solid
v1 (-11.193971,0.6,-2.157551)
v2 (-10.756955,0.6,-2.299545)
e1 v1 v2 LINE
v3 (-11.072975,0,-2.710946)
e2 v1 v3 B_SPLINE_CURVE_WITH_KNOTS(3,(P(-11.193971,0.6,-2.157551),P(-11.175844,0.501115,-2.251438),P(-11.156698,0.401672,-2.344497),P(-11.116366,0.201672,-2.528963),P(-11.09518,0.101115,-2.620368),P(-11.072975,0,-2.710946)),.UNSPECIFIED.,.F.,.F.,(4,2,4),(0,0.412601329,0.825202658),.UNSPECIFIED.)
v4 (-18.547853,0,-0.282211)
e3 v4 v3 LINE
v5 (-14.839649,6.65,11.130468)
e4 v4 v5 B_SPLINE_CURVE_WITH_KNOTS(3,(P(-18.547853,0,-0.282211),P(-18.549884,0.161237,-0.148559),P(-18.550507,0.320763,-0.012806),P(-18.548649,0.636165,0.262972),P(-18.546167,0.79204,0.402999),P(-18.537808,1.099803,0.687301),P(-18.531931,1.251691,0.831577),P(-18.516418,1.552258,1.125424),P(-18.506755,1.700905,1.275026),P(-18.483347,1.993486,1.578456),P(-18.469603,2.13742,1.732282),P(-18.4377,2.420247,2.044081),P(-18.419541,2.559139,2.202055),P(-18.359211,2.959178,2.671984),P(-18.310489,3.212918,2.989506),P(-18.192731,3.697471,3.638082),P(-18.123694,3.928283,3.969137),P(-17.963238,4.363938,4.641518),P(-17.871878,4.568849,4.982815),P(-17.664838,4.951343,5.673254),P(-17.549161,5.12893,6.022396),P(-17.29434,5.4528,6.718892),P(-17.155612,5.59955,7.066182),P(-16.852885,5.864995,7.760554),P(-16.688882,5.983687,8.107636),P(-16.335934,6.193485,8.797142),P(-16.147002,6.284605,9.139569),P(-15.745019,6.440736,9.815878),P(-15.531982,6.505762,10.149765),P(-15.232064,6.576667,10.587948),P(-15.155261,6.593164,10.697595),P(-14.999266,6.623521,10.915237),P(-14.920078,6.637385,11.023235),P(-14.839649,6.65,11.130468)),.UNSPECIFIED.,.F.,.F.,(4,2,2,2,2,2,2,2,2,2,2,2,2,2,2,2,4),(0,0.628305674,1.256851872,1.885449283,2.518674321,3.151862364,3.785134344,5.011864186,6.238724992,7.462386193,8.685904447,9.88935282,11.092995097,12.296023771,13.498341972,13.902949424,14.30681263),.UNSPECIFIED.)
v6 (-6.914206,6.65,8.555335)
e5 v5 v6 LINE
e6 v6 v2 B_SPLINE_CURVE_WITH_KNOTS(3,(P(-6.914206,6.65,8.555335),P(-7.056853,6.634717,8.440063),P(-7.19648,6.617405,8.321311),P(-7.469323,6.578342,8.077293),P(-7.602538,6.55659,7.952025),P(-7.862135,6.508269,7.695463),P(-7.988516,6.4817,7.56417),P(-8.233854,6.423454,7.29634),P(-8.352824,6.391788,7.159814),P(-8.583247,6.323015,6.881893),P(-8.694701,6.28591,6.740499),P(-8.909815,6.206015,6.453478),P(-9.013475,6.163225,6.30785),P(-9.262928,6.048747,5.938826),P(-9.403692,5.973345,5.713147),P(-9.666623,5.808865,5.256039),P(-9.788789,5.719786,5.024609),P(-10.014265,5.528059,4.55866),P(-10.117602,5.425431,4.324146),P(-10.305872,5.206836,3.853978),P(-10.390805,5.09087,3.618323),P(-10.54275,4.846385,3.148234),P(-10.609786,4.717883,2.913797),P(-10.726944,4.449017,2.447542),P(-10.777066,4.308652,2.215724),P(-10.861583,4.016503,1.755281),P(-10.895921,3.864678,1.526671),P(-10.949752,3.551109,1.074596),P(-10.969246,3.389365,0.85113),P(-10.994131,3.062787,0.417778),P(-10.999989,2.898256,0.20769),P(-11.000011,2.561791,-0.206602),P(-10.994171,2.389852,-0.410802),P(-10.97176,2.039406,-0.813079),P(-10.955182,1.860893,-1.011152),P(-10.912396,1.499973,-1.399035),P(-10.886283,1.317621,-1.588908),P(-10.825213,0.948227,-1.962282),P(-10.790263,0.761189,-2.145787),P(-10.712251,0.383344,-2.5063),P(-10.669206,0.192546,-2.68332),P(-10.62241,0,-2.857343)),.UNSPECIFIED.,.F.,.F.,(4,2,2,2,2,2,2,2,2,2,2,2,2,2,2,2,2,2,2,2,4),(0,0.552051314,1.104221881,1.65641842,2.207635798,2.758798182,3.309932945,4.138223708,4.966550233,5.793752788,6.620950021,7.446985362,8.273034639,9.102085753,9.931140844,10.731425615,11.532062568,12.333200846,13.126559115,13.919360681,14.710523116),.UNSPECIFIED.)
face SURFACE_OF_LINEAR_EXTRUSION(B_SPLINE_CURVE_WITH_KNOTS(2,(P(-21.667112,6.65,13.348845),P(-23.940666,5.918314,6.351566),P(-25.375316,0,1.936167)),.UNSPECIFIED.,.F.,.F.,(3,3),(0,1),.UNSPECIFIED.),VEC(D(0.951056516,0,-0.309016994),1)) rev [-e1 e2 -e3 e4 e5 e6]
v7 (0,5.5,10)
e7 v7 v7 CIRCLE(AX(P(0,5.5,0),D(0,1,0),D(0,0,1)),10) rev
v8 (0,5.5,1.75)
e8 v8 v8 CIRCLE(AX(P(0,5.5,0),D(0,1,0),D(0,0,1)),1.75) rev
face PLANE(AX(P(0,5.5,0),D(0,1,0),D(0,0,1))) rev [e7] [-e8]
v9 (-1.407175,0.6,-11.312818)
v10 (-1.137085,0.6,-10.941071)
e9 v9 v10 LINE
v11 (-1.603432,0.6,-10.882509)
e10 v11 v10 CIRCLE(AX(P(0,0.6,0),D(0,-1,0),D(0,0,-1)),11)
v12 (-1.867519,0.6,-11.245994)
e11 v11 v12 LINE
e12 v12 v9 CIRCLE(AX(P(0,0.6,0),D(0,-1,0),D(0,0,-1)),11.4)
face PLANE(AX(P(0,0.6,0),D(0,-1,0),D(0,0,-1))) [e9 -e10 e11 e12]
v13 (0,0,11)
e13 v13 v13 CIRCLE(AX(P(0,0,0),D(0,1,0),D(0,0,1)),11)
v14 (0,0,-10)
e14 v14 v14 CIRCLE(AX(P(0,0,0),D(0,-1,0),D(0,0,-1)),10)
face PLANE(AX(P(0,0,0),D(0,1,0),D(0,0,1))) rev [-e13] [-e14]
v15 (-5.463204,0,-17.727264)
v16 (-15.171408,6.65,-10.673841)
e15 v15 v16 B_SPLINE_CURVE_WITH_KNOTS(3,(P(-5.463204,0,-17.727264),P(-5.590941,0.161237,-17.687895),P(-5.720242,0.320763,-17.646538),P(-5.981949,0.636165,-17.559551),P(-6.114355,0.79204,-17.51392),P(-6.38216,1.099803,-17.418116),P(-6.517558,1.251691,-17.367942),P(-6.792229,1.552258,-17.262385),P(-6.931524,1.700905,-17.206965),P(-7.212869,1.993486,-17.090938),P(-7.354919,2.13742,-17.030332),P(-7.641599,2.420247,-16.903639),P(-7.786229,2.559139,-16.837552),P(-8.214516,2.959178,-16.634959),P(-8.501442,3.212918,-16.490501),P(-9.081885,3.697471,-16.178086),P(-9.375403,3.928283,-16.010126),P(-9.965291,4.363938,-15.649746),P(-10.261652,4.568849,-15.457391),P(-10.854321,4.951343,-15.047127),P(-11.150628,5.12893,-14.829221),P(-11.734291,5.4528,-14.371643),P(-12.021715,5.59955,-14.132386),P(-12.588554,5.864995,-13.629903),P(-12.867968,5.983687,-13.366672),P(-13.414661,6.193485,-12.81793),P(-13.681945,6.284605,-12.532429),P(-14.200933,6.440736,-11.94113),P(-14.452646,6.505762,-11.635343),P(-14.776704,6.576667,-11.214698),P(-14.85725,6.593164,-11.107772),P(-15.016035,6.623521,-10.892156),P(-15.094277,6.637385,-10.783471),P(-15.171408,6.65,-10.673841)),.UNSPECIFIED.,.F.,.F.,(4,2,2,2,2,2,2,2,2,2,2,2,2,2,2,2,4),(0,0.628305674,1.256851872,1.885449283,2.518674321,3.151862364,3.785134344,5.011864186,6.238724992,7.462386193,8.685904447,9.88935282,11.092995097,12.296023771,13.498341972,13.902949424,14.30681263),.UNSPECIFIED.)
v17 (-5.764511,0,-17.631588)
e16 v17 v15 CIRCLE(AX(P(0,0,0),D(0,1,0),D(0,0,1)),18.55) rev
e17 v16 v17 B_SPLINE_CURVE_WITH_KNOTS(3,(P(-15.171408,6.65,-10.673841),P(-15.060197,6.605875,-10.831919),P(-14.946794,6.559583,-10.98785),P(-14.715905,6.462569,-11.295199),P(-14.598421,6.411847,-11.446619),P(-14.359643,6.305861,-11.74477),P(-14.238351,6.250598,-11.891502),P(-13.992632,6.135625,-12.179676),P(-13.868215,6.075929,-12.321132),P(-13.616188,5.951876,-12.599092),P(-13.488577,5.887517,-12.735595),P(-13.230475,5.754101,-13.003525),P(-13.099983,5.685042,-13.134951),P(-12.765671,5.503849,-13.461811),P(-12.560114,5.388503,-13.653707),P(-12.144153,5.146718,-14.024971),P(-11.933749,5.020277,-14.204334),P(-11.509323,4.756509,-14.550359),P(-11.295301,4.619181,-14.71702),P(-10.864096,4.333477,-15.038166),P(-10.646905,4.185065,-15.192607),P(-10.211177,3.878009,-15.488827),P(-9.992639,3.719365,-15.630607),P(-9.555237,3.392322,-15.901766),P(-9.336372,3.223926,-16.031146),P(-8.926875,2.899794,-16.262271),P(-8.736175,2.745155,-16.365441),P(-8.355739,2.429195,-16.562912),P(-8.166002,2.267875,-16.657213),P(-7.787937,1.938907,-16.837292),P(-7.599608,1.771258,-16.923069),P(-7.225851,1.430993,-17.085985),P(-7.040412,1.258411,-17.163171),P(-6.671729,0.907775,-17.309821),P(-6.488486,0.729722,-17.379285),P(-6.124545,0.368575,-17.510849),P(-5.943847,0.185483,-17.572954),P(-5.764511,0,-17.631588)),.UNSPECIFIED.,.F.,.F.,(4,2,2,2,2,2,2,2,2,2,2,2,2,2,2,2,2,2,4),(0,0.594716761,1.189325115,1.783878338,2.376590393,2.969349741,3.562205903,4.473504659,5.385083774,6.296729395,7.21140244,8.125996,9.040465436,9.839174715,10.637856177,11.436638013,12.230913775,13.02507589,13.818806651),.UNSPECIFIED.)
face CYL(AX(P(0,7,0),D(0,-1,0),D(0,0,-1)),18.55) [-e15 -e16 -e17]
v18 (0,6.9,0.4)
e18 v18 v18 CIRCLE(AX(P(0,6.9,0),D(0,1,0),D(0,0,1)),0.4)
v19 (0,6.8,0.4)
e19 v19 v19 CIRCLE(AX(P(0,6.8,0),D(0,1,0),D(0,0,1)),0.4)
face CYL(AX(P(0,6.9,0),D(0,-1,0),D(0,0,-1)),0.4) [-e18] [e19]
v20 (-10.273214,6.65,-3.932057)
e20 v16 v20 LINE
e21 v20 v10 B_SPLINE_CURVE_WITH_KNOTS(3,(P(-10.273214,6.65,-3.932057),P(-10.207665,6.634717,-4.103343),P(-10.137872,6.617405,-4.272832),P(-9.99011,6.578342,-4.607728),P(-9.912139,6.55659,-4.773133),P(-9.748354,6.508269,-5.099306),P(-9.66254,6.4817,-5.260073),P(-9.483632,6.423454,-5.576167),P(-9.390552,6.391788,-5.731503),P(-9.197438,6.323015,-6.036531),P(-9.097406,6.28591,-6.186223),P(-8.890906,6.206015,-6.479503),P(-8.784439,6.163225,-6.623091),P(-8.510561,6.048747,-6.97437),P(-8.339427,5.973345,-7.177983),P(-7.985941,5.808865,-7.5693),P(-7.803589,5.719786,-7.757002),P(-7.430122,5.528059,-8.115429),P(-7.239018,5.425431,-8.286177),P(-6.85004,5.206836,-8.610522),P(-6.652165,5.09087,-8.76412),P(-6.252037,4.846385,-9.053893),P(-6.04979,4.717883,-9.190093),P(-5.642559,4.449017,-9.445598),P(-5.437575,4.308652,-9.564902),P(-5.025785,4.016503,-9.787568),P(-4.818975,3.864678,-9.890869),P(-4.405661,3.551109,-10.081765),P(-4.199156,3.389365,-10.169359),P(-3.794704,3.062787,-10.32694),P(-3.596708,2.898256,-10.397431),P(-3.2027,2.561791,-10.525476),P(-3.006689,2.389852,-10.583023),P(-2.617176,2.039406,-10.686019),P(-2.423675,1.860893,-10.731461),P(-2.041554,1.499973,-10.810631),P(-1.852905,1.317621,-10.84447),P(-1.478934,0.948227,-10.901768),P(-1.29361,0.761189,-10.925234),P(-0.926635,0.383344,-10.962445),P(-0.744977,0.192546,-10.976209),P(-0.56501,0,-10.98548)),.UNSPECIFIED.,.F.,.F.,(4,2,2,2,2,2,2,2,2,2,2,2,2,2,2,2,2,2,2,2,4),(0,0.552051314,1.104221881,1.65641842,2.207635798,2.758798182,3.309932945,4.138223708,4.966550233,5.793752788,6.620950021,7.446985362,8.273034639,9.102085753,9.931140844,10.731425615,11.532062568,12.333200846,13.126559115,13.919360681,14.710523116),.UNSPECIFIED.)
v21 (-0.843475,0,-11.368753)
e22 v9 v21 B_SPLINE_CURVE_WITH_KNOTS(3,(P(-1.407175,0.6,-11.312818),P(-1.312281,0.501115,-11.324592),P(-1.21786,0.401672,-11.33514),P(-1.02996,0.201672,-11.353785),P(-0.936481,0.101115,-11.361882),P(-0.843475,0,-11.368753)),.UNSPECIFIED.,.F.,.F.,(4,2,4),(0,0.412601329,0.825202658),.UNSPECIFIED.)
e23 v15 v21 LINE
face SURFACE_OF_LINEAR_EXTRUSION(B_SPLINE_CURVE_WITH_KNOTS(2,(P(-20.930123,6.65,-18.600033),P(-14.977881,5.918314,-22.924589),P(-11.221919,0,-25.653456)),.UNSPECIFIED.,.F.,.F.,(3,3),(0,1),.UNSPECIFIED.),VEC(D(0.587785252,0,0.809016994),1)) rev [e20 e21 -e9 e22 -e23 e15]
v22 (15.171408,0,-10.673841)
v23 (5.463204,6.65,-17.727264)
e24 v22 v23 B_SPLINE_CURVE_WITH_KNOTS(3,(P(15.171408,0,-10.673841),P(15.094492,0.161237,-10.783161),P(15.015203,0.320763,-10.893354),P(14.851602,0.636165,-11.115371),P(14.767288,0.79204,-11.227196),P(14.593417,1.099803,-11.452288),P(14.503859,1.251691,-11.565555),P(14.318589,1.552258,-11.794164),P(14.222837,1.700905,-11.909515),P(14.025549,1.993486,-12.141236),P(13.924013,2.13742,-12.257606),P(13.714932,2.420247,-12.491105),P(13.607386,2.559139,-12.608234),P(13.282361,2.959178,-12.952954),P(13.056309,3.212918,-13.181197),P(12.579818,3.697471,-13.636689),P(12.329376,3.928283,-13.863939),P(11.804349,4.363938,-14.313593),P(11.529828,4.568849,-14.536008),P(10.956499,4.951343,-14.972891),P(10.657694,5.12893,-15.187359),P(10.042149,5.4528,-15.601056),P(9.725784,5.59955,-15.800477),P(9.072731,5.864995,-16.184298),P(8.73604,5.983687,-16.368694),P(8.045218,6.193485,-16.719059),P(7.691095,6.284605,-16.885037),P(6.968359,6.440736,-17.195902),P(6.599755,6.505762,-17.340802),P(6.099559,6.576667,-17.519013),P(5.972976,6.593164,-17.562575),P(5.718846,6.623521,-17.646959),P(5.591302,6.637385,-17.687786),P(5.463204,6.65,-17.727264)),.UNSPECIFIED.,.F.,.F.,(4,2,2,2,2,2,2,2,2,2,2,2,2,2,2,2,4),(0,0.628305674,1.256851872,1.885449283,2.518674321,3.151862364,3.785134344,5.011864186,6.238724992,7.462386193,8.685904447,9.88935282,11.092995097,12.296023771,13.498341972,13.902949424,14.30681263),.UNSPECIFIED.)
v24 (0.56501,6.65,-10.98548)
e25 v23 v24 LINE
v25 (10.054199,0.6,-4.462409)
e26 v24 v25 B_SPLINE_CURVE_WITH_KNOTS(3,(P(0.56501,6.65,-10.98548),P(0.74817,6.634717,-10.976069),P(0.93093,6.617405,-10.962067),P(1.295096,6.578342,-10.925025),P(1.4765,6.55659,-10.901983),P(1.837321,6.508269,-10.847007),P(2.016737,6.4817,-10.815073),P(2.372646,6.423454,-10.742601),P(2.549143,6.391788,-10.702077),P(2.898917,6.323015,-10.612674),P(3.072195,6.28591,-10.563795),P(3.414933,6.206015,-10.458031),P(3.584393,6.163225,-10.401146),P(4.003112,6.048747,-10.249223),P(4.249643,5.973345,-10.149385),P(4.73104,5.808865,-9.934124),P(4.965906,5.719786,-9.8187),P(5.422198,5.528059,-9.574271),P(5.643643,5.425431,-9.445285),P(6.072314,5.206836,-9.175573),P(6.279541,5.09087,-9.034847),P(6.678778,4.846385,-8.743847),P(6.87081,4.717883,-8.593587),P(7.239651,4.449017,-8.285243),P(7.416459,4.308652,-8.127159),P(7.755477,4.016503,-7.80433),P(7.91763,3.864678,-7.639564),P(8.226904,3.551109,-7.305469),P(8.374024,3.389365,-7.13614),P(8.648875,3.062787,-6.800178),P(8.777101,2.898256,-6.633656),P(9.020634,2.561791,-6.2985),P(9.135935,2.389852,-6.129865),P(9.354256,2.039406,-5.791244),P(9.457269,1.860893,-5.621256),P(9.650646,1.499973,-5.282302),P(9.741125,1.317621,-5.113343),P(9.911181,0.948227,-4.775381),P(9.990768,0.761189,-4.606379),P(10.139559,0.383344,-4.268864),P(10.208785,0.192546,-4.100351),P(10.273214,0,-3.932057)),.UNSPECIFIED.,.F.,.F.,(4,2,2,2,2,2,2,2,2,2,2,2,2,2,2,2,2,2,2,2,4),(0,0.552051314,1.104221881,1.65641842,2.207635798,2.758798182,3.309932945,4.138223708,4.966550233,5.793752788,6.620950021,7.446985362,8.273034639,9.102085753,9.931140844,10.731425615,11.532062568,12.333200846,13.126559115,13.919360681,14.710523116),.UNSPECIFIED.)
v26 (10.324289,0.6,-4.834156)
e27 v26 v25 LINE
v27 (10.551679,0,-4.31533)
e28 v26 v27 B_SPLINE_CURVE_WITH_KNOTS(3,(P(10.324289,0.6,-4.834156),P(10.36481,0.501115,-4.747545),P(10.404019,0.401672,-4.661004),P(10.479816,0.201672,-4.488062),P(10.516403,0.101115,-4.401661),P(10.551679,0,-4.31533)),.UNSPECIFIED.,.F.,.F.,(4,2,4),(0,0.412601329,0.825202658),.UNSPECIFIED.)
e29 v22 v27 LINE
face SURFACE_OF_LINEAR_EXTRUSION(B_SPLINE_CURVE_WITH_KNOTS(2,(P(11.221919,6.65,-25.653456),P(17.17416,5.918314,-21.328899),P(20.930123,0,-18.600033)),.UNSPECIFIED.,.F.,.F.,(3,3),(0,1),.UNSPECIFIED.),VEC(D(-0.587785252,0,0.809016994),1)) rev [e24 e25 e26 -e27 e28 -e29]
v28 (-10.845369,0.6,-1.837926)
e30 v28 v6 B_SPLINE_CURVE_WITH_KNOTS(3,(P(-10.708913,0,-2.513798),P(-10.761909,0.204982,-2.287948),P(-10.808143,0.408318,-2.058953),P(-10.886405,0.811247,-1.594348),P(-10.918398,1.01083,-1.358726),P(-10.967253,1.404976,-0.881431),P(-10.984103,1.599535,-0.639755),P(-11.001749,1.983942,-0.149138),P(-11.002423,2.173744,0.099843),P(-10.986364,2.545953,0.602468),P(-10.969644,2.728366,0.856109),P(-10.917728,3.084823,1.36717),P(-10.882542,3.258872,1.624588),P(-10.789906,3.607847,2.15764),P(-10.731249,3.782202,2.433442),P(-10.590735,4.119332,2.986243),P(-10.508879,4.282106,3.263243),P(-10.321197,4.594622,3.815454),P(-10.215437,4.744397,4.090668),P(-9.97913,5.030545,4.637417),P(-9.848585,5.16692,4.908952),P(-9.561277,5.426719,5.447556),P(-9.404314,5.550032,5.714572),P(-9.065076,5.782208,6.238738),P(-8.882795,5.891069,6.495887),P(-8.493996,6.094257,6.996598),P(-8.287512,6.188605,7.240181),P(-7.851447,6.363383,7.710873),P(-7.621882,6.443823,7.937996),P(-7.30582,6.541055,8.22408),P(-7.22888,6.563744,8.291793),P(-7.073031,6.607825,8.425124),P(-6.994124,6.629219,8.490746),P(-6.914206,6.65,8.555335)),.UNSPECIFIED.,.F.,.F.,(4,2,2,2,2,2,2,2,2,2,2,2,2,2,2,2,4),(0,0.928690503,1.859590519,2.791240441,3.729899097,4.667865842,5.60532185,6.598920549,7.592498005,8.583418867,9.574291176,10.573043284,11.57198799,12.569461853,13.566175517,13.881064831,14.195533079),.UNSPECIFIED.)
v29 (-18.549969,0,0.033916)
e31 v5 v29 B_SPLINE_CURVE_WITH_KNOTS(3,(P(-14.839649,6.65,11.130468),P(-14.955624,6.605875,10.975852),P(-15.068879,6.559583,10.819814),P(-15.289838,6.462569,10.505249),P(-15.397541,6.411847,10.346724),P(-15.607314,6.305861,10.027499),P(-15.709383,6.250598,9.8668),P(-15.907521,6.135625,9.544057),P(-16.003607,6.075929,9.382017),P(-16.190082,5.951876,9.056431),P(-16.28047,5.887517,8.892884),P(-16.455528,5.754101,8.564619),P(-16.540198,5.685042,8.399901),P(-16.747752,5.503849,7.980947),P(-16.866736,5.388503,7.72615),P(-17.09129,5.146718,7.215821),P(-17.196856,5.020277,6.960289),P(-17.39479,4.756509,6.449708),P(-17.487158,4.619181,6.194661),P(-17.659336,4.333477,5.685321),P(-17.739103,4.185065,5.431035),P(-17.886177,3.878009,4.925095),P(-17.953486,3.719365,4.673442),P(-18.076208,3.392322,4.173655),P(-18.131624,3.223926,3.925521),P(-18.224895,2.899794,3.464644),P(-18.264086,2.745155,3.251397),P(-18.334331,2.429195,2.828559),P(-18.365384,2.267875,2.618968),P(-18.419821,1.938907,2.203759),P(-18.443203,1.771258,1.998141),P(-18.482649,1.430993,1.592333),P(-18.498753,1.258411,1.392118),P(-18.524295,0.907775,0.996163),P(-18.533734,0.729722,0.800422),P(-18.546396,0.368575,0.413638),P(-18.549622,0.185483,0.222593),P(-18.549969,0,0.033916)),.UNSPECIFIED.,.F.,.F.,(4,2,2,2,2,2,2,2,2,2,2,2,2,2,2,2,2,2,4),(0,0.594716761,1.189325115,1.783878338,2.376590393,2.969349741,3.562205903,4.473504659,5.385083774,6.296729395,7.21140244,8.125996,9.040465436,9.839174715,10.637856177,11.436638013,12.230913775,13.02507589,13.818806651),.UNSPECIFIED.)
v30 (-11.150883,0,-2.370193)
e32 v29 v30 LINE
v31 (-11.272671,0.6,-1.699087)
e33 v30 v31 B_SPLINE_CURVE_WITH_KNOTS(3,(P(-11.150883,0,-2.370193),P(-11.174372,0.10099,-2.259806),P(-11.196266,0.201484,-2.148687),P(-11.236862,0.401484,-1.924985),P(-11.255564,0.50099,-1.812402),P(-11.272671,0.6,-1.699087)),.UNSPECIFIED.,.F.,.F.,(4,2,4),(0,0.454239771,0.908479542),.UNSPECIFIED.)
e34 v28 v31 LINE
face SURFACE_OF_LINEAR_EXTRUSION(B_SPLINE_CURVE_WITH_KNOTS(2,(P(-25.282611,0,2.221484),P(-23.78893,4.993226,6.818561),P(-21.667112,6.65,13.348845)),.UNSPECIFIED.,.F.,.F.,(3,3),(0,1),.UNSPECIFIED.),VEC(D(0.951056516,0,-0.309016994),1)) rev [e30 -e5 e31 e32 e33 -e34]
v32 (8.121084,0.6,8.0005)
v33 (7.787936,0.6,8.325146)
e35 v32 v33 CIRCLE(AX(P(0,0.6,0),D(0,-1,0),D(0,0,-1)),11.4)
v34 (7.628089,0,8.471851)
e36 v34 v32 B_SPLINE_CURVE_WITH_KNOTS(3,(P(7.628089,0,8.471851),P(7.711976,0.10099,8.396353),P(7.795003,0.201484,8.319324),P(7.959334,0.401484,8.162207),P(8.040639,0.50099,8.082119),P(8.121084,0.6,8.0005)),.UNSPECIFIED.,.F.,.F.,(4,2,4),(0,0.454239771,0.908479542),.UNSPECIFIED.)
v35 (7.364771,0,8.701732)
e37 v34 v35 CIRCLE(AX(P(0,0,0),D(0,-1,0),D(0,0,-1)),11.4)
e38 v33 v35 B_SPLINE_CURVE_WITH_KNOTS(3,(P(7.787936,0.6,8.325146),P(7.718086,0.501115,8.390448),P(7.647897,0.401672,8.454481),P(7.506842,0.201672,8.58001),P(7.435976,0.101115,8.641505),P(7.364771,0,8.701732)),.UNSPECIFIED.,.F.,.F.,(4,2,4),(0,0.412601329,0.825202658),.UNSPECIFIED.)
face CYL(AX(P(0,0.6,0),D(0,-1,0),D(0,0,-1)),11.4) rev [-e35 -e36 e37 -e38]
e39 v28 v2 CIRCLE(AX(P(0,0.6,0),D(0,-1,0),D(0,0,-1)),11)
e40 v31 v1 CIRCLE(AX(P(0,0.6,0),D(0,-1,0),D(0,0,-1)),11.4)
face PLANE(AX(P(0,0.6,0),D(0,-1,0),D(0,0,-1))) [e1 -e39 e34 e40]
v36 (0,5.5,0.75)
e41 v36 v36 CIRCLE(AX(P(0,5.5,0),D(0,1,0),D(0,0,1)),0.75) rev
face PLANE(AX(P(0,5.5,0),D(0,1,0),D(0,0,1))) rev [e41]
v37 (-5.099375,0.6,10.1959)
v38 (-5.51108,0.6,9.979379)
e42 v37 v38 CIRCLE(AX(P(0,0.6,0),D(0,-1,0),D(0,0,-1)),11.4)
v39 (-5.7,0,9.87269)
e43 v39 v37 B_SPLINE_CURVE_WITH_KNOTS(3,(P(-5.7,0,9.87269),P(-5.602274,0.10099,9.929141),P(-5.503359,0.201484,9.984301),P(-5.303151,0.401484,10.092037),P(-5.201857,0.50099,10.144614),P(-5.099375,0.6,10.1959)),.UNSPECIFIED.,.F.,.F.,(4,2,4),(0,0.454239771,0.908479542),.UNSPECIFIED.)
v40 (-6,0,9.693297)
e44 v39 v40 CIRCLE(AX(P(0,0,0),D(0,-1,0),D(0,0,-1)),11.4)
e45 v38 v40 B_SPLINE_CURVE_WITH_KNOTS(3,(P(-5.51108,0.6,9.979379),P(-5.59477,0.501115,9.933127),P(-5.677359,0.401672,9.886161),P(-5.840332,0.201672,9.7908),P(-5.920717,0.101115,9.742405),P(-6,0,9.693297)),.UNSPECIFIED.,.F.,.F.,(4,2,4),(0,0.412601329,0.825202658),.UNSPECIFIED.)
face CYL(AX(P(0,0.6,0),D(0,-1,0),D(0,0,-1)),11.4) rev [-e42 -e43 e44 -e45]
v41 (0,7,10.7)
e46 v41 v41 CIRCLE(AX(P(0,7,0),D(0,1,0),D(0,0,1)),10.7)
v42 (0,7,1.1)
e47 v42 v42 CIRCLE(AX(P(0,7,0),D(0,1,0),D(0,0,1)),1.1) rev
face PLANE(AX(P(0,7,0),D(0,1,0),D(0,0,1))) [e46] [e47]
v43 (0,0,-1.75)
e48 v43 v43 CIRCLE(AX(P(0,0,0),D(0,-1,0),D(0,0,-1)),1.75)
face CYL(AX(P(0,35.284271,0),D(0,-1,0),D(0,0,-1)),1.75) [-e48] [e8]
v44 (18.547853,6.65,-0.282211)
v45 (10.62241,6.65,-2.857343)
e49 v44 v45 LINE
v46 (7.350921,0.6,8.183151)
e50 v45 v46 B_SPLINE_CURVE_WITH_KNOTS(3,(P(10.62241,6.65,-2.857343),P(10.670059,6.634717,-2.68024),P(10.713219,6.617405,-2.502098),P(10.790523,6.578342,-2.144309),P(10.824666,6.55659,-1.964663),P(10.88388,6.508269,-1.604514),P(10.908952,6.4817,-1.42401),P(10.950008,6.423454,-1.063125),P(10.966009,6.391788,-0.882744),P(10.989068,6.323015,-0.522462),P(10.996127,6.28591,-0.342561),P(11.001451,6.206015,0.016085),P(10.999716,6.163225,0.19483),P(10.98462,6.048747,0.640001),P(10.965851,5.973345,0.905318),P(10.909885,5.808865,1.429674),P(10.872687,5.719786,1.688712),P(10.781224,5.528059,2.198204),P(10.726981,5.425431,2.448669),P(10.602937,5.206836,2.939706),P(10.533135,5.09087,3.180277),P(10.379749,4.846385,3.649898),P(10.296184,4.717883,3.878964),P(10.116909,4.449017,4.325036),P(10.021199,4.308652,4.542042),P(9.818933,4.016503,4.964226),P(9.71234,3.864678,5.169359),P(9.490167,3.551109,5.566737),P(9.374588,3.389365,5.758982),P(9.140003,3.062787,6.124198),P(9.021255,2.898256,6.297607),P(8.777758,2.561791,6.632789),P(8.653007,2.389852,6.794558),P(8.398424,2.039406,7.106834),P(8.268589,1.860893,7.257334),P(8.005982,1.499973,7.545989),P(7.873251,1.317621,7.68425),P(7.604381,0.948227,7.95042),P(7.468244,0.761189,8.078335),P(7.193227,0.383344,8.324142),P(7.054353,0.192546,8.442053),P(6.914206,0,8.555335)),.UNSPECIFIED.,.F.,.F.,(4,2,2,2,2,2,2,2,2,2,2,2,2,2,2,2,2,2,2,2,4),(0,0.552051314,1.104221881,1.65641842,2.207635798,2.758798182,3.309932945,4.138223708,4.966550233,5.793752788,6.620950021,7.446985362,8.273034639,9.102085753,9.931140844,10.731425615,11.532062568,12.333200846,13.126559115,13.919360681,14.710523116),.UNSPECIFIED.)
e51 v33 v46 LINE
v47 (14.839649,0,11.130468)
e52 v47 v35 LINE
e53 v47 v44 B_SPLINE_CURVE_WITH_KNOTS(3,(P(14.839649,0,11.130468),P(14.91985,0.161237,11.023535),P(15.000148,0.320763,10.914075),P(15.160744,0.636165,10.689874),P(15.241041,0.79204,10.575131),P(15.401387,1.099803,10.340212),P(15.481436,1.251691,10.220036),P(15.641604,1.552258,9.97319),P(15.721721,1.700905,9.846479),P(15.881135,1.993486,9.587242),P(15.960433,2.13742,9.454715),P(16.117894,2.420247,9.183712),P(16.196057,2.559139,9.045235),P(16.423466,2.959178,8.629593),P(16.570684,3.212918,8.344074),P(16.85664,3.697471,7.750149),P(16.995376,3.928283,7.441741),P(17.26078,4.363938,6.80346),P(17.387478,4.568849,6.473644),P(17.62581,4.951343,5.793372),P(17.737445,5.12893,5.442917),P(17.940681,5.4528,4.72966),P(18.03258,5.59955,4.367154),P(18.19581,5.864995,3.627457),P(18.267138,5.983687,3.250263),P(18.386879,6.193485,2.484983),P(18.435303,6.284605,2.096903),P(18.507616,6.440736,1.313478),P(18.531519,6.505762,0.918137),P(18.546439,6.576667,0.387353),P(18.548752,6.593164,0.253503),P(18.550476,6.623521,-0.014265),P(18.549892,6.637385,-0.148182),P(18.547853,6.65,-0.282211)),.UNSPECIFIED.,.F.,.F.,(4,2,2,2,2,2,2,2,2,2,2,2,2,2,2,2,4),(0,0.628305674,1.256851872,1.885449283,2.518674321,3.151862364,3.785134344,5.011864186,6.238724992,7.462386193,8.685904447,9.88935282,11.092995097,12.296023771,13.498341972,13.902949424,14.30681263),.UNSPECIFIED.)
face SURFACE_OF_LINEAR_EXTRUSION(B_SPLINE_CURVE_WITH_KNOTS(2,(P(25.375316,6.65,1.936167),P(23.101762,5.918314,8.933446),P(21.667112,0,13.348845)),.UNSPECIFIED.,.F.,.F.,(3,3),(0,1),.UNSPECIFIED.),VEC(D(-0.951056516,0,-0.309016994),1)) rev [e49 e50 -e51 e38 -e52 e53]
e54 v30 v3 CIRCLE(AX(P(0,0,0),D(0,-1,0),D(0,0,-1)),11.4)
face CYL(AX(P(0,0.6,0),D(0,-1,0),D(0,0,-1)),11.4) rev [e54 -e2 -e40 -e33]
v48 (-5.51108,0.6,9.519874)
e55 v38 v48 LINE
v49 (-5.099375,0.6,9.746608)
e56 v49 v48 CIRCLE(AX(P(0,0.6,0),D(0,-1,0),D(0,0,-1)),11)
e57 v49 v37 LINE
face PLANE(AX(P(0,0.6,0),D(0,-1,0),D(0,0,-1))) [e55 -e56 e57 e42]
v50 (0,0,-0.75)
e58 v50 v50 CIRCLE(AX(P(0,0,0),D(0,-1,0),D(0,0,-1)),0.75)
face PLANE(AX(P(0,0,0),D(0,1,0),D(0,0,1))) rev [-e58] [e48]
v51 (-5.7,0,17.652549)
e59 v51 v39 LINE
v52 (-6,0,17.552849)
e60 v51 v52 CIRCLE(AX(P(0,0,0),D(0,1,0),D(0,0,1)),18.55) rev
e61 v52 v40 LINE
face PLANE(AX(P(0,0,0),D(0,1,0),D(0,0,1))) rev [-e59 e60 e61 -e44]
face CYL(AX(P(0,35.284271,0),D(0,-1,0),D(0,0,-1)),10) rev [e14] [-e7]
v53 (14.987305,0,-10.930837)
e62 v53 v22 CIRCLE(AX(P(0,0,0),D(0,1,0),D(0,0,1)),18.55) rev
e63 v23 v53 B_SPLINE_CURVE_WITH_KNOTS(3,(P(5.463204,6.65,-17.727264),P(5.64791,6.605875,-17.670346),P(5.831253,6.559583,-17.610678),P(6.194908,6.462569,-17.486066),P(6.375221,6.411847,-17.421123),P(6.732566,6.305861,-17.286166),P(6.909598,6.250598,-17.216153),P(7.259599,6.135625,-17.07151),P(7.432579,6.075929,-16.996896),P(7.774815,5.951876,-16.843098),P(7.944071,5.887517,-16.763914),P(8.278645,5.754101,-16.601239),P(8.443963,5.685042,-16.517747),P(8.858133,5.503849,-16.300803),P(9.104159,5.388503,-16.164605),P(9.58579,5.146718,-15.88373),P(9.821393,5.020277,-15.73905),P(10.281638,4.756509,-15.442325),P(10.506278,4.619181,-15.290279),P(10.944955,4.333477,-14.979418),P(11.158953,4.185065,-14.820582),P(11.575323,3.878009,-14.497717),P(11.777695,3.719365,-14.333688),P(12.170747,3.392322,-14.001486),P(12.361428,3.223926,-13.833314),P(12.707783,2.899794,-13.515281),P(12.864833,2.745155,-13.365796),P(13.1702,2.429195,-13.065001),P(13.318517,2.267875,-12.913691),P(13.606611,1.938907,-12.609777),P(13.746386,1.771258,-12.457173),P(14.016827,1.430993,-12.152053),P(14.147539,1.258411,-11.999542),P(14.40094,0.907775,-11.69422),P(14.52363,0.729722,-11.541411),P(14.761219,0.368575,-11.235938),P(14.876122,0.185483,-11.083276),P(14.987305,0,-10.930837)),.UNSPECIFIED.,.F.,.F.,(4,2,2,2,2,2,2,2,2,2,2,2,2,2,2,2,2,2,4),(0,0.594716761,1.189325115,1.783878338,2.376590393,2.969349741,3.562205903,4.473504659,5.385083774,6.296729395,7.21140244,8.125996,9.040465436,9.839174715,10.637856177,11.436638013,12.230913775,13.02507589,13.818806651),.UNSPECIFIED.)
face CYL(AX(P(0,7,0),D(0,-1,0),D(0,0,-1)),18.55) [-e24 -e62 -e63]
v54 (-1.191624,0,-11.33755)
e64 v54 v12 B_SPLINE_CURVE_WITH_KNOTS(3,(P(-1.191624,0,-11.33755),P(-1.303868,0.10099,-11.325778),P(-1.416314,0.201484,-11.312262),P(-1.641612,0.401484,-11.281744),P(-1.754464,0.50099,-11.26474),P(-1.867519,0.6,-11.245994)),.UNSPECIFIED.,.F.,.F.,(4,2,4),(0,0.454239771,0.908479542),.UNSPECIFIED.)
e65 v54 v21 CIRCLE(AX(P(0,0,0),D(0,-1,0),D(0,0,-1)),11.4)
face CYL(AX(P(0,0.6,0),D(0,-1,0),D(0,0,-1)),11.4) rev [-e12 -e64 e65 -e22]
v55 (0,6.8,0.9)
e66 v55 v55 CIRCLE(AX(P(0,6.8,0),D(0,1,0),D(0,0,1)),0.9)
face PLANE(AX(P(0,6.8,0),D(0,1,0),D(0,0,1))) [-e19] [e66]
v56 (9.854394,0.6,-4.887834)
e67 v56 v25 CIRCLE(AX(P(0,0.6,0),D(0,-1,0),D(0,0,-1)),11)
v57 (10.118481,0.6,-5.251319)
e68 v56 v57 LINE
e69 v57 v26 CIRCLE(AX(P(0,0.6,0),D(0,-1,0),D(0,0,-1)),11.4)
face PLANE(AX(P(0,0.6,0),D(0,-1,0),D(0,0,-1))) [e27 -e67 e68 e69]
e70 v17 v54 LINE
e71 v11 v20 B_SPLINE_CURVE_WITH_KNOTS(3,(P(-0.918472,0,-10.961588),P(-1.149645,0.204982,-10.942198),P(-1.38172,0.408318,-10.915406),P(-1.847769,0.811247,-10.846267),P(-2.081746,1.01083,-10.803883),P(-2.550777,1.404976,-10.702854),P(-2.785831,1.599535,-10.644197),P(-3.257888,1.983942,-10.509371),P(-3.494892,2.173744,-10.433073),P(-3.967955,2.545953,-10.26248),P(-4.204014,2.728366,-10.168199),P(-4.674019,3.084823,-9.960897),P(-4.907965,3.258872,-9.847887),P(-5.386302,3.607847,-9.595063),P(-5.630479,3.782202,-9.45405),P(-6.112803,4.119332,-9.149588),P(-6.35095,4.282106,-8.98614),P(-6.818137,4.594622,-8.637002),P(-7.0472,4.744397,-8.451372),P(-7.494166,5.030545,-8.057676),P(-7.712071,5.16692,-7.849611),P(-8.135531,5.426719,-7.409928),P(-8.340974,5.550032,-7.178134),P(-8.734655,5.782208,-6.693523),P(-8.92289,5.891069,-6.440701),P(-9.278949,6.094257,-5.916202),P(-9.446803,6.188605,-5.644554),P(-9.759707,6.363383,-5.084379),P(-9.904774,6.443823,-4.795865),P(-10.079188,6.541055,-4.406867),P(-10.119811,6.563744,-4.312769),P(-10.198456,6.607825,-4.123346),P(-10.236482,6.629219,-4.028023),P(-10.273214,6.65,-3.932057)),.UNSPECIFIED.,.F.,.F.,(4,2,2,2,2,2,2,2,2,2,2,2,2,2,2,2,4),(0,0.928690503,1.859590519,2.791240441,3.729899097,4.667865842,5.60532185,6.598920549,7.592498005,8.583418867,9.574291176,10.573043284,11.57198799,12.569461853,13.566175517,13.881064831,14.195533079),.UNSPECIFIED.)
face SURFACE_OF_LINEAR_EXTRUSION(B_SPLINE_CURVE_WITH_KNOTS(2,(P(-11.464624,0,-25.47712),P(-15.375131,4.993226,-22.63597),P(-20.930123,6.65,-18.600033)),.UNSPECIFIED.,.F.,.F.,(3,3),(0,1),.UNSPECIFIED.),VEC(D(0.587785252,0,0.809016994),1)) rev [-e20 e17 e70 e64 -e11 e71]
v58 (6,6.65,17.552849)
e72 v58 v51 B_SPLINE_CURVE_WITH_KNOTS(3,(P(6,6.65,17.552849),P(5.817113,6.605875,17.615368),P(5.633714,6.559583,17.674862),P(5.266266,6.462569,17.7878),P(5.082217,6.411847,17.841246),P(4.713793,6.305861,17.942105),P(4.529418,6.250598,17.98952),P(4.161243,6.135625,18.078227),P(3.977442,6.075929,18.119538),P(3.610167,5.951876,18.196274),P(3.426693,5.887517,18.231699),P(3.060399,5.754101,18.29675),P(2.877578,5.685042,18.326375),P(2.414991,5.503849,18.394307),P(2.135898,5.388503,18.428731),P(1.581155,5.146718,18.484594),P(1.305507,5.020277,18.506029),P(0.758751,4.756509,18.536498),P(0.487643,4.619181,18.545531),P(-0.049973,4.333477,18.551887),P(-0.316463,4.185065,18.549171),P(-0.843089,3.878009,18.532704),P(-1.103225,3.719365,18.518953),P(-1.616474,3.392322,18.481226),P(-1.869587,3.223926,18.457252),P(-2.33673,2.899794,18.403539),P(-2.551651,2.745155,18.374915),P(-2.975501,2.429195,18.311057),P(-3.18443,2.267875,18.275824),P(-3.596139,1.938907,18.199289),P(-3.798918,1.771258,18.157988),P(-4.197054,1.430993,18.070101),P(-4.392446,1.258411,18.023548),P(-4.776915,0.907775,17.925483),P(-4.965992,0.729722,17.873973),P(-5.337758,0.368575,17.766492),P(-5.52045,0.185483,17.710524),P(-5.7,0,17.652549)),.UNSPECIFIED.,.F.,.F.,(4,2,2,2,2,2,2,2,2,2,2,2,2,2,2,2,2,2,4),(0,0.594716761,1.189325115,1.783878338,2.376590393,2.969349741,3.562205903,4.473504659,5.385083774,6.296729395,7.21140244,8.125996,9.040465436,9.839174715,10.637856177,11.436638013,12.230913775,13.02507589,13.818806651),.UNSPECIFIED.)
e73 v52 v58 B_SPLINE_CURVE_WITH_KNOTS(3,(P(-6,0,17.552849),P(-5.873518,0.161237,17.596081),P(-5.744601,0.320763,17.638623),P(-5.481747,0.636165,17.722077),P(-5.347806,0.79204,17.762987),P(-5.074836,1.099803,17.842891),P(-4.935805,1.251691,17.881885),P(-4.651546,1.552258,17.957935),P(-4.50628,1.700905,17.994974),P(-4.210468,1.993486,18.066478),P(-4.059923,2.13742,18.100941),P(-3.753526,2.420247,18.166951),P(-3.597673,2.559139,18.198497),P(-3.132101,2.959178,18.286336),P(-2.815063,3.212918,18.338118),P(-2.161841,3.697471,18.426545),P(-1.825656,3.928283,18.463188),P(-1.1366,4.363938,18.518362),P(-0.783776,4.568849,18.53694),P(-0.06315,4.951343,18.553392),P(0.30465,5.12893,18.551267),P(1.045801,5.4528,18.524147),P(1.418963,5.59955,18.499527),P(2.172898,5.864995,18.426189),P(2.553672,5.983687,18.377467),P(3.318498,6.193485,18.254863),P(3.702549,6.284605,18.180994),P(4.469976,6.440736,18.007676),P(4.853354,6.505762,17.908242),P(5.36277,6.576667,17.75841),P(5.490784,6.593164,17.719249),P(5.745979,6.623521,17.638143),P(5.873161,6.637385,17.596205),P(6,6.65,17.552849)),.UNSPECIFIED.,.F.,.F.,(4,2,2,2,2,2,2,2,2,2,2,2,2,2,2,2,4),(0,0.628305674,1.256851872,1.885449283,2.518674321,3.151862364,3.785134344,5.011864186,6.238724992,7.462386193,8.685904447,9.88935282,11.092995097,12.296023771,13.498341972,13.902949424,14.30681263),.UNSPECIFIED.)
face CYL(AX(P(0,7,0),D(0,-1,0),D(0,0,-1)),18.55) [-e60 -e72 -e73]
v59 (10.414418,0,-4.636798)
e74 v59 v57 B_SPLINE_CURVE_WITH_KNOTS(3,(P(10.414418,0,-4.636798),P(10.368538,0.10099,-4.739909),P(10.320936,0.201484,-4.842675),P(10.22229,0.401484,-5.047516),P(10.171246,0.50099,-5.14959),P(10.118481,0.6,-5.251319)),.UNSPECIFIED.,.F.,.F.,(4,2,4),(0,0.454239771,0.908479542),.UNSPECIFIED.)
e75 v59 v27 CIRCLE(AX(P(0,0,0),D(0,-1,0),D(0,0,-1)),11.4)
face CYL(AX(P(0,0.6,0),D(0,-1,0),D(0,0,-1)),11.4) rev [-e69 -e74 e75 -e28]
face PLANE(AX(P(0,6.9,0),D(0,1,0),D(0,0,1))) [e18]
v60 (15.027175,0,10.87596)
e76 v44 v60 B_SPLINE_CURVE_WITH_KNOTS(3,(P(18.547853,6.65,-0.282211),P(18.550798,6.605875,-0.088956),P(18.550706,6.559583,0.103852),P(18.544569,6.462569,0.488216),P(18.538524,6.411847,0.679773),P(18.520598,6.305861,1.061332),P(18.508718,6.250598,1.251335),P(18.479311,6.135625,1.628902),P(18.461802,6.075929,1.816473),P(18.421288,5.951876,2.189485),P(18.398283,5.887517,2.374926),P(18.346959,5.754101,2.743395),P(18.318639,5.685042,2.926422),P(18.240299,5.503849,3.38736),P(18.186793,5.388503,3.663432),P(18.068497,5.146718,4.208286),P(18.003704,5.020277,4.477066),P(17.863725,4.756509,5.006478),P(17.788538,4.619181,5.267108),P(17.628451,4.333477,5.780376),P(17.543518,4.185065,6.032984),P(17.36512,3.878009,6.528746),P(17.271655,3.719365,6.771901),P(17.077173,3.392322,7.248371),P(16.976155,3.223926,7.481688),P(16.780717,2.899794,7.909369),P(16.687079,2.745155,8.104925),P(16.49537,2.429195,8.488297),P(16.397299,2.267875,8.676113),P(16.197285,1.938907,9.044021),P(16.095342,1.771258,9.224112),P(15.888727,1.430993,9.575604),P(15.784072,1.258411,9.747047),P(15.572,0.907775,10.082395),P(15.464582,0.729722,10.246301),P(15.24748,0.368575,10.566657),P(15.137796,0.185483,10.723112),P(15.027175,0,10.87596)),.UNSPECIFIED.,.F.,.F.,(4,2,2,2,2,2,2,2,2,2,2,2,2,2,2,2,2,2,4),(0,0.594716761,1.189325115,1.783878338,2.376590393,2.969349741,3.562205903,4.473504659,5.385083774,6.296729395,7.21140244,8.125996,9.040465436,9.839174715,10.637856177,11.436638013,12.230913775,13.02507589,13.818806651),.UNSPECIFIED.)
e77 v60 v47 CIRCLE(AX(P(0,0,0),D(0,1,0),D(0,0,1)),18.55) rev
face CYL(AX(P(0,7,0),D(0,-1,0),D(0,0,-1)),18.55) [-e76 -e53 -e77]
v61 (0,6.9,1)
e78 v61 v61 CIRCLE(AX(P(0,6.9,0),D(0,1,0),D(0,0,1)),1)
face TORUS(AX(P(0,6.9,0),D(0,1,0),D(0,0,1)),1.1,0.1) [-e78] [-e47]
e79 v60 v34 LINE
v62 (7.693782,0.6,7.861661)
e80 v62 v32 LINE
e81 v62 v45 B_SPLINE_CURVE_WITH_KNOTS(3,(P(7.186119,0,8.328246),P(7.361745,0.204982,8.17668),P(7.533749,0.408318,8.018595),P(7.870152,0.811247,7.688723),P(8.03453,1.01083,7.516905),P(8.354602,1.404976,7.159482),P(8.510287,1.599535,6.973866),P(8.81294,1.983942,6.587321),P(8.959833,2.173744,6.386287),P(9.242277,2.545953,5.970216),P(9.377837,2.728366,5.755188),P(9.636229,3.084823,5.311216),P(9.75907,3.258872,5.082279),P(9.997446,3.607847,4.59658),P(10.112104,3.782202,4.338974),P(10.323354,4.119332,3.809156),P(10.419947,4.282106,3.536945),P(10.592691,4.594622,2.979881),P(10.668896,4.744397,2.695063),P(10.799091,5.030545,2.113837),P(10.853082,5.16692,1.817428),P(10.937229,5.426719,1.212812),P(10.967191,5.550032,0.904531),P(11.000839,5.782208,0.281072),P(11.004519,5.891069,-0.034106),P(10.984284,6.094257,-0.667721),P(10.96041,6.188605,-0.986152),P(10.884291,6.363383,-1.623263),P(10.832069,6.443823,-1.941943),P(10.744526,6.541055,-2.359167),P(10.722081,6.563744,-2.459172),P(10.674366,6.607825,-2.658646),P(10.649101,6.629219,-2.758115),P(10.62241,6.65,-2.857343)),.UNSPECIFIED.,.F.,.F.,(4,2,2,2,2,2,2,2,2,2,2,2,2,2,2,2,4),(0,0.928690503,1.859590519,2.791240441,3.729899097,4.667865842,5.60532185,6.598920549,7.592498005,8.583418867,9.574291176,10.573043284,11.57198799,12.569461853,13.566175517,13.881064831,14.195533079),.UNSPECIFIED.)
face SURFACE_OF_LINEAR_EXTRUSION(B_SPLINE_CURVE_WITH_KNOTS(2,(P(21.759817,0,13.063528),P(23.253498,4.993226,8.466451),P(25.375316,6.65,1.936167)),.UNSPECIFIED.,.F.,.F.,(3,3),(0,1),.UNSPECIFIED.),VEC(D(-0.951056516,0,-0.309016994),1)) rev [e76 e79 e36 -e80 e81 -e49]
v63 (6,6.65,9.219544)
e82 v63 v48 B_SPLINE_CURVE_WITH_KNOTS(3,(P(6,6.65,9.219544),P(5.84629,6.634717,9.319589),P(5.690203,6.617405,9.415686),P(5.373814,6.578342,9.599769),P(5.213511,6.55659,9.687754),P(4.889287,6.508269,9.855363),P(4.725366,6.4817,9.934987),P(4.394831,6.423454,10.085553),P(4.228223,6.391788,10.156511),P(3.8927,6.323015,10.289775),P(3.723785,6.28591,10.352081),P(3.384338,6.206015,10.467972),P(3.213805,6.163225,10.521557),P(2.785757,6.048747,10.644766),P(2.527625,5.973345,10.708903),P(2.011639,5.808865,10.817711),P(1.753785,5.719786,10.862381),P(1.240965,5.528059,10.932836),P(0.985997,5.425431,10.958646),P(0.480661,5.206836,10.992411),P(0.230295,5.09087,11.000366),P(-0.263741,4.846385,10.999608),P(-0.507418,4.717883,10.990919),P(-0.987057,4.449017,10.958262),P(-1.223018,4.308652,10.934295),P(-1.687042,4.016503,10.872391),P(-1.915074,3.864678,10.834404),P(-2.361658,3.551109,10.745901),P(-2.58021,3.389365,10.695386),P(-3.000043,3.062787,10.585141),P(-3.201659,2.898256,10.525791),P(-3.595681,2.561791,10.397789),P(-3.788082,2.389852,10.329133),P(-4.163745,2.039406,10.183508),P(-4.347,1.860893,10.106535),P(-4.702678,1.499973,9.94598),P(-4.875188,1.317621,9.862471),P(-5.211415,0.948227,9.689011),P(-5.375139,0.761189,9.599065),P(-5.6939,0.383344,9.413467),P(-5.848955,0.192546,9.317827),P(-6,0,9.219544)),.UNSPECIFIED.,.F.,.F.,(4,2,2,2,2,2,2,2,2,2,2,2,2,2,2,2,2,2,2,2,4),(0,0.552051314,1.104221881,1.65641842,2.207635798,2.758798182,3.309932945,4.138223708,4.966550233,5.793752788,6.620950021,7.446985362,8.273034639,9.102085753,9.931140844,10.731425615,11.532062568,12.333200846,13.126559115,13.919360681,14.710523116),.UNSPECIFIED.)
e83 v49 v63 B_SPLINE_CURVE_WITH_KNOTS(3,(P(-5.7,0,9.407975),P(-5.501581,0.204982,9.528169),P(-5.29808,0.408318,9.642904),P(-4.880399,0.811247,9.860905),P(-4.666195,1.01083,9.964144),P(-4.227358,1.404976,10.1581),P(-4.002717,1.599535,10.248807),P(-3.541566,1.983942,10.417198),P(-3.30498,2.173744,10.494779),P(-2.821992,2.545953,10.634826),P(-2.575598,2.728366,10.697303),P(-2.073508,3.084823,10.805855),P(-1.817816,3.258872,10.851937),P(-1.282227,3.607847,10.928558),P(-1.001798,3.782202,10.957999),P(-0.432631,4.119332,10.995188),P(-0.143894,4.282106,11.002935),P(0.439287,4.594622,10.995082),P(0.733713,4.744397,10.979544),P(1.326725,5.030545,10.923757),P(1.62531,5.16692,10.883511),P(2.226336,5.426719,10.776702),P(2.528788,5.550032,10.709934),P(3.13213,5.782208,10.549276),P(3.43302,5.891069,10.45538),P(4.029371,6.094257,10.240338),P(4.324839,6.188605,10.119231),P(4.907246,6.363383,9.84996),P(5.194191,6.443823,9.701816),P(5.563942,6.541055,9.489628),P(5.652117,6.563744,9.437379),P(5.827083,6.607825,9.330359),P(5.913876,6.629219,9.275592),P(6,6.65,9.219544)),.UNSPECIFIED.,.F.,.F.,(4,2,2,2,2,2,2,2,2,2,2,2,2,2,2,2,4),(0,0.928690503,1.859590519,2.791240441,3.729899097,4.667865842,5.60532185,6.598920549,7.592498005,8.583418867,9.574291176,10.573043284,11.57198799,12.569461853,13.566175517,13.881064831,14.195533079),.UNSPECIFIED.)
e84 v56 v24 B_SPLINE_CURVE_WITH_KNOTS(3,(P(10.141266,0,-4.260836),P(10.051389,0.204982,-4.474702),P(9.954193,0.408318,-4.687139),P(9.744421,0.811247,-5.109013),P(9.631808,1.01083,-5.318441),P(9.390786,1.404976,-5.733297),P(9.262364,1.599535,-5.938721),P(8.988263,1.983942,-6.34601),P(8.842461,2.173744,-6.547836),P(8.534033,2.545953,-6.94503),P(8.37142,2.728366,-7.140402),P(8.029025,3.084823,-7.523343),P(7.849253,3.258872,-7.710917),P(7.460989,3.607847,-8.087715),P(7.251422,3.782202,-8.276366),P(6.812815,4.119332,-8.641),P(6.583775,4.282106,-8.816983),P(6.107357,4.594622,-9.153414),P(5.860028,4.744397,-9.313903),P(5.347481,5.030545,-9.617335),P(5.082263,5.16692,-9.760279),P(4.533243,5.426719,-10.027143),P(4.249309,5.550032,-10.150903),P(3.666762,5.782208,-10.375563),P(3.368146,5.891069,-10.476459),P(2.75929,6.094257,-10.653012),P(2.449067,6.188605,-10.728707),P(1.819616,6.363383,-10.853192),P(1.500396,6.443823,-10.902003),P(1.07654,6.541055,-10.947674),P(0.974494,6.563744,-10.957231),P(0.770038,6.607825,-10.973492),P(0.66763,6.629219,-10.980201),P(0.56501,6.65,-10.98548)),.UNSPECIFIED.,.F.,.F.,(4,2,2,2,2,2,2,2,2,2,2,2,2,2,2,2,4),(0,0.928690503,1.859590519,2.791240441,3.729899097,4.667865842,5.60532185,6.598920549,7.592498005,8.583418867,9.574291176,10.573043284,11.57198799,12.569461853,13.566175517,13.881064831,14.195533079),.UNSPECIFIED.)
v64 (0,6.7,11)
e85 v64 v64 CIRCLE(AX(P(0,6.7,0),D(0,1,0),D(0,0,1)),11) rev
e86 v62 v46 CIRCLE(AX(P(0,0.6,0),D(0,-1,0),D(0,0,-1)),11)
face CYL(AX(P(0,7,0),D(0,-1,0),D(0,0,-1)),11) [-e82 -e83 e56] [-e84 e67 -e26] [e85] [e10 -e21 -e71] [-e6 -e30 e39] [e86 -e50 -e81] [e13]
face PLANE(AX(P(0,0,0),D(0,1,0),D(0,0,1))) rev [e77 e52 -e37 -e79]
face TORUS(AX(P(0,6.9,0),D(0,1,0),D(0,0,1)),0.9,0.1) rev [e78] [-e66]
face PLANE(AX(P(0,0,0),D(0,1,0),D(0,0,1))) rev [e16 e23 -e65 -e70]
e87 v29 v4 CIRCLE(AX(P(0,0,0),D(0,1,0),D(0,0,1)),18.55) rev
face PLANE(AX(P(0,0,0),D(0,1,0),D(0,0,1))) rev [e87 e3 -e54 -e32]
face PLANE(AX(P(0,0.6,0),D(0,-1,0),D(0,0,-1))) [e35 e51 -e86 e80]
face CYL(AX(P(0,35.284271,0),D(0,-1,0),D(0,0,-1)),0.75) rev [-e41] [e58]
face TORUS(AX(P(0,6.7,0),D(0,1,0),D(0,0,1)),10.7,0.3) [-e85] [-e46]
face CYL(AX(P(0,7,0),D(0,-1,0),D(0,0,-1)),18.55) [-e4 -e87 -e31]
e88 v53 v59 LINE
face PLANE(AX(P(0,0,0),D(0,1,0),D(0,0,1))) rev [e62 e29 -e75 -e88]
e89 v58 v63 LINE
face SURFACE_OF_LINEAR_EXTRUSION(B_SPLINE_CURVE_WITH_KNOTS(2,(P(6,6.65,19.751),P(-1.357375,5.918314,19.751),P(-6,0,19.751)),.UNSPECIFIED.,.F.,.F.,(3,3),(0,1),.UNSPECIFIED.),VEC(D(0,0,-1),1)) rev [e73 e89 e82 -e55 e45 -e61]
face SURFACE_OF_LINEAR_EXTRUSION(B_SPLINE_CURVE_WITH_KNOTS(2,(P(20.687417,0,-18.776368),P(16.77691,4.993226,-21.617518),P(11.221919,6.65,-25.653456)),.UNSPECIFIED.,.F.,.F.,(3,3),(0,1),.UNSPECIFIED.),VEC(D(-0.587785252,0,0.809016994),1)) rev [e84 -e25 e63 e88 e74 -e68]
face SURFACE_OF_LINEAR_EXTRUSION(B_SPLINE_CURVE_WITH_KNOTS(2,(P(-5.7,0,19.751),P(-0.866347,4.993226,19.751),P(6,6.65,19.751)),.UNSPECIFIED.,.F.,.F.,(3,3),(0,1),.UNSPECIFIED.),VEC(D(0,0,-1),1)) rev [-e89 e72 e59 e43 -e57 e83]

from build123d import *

# Parameters (mm, degrees)
SKETCH1_R                = 11
BOSS_EXTRUDE1_DEPTH      = 7
BOSS_EXTRUDE2_REACH      = 19.059
BOSS_EXTRUDE2_END_RADIUS = 18.55
CIRPATTERN1_COUNT        = 5
SKETCH4_R                = 10
SKETCH4_R_2              = 1.75
SKETCH4_R_3              = 0.75
CUT_EXTRUDE1_DEPTH       = 5.5
FILLET1_R                = 0.3
SKETCH5_R                = 1
CUT_EXTRUDE2_DEPTH       = 0.2
FILLET2_R                = 0.1
SKETCH6_R                = 11.4
SKETCH6_R_2              = 11
CUT_EXTRUDE3_DEPTH       = 0.6
SKETCH7_R                = 0.4
BOSS_EXTRUDE3_DEPTH      = 0.1


with BuildPart() as part:
    # Sketch1 → Boss-Extrude1 (new body)
    with BuildSketch(Plane(origin=(0, 0, 0), x_dir=(1, 0, 0), z_dir=(0, 1, 0))):
        with Locations(Location((0, 0, 0), (0, 0, 270))):
            Circle(SKETCH1_R)
    extrude(amount=BOSS_EXTRUDE1_DEPTH)

    # Boss-Extrude2: up to this cylinder (the profile starts inside it)
    boss_extrude2_end = Plane(origin=(0, 3.843243, 0), z_dir=(0, -1, 0)) * Cylinder(BOSS_EXTRUDE2_END_RADIUS, 76.218, mode=Mode.PRIVATE)
    # Sketch2 → Boss-Extrude2 (add, up to the surface)
    with BuildSketch(Plane.XY, mode=Mode.PRIVATE) as boss_extrude2_sk1:
        with BuildLine():
            Line((-6, 0), (-5.7, 0))
            add(Edge.make_bspline(
                [(6, 6.65), (-0.86634689, 4.993225635), (-5.7, 0)],
                knots=[0, 0, 0, 1, 1, 1], degree=2))
            add(Edge.make_bspline(
                [(6, 6.65), (-1.357374642, 5.918314261), (-6, 0)],
                knots=[0, 0, 0, 1, 1, 1], degree=2))
        make_face()
    boss_extrude2_tool1 = extrude(boss_extrude2_sk1.sketch, amount=BOSS_EXTRUDE2_REACH, mode=Mode.PRIVATE) & boss_extrude2_end
    boss_extrude2 = boss_extrude2_tool1.solids().sort_by_distance((-0.900536, 3.843243, 0))[0]
    add(boss_extrude2)

    # CirPattern1: Boss-Extrude2 ×5 about axis
    cirpattern1_axis = Axis((0, 7, 0), (0, -1, 0))
    for i in range(1, CIRPATTERN1_COUNT):
        add(boss_extrude2.rotate(cirpattern1_axis, i * 360 / CIRPATTERN1_COUNT))

    # Sketch4 → Cut-Extrude1 (cut)
    # profile 1 of 2: a face of its own
    with BuildSketch(Plane.XZ):
        with Locations(Location((0, 0, 0), (0, 0, 270))):
            Circle(SKETCH4_R)
        with Locations(Location((0, 0, 0), (0, 0, 270))):
            Circle(SKETCH4_R_2, mode=Mode.SUBTRACT)
    # profile 2 of 2: a face of its own
    with BuildSketch(Plane.XZ):
        with Locations(Location((0, 0, 0), (0, 0, 270))):
            Circle(SKETCH4_R_3)
    extrude(amount=-CUT_EXTRUDE1_DEPTH, mode=Mode.SUBTRACT)

    # Fillet1
    fillet1_edges = [part.edges().sort_by_distance(p)[0] for p in [
        (0, 7, -11),
    ]]
    fillet(fillet1_edges, radius=FILLET1_R)

    # Sketch5 → Cut-Extrude2 (cut)
    with BuildSketch(Plane(origin=(0, 7, 0), x_dir=(1, 0, 0), z_dir=(0, 1, 0))):
        with Locations(Location((0, 0, 0), (0, 0, 270))):
            Circle(SKETCH5_R)
    extrude(amount=-CUT_EXTRUDE2_DEPTH, mode=Mode.SUBTRACT)

    # Fillet2
    fillet2_edges = [part.edges().sort_by_distance(p)[0] for p in [
        (0, 6.8, -1),
        (0, 7, -1),
    ]]
    fillet(fillet2_edges, radius=FILLET2_R - 0.0001)  # a hair under: the kernel refuses the full size

    # Sketch6 → Cut-Extrude3 (cut)
    with BuildSketch(Plane.XZ):
        Circle(SKETCH6_R)
        with Locations(Location((0, 0, 0), (0, 0, 90))):
            Circle(SKETCH6_R_2, mode=Mode.SUBTRACT)
    extrude(amount=-CUT_EXTRUDE3_DEPTH, mode=Mode.SUBTRACT)

    # Sketch7 → Boss-Extrude3 (add)
    with BuildSketch(Plane(origin=(0, 6.8, 0), x_dir=(1, 0, 0), z_dir=(0, 1, 0))):
        with Locations(Location((0, 0, 0), (0, 0, 270))):
            Circle(SKETCH7_R)
    extrude(amount=BOSS_EXTRUDE3_DEPTH)


solid = part.part
